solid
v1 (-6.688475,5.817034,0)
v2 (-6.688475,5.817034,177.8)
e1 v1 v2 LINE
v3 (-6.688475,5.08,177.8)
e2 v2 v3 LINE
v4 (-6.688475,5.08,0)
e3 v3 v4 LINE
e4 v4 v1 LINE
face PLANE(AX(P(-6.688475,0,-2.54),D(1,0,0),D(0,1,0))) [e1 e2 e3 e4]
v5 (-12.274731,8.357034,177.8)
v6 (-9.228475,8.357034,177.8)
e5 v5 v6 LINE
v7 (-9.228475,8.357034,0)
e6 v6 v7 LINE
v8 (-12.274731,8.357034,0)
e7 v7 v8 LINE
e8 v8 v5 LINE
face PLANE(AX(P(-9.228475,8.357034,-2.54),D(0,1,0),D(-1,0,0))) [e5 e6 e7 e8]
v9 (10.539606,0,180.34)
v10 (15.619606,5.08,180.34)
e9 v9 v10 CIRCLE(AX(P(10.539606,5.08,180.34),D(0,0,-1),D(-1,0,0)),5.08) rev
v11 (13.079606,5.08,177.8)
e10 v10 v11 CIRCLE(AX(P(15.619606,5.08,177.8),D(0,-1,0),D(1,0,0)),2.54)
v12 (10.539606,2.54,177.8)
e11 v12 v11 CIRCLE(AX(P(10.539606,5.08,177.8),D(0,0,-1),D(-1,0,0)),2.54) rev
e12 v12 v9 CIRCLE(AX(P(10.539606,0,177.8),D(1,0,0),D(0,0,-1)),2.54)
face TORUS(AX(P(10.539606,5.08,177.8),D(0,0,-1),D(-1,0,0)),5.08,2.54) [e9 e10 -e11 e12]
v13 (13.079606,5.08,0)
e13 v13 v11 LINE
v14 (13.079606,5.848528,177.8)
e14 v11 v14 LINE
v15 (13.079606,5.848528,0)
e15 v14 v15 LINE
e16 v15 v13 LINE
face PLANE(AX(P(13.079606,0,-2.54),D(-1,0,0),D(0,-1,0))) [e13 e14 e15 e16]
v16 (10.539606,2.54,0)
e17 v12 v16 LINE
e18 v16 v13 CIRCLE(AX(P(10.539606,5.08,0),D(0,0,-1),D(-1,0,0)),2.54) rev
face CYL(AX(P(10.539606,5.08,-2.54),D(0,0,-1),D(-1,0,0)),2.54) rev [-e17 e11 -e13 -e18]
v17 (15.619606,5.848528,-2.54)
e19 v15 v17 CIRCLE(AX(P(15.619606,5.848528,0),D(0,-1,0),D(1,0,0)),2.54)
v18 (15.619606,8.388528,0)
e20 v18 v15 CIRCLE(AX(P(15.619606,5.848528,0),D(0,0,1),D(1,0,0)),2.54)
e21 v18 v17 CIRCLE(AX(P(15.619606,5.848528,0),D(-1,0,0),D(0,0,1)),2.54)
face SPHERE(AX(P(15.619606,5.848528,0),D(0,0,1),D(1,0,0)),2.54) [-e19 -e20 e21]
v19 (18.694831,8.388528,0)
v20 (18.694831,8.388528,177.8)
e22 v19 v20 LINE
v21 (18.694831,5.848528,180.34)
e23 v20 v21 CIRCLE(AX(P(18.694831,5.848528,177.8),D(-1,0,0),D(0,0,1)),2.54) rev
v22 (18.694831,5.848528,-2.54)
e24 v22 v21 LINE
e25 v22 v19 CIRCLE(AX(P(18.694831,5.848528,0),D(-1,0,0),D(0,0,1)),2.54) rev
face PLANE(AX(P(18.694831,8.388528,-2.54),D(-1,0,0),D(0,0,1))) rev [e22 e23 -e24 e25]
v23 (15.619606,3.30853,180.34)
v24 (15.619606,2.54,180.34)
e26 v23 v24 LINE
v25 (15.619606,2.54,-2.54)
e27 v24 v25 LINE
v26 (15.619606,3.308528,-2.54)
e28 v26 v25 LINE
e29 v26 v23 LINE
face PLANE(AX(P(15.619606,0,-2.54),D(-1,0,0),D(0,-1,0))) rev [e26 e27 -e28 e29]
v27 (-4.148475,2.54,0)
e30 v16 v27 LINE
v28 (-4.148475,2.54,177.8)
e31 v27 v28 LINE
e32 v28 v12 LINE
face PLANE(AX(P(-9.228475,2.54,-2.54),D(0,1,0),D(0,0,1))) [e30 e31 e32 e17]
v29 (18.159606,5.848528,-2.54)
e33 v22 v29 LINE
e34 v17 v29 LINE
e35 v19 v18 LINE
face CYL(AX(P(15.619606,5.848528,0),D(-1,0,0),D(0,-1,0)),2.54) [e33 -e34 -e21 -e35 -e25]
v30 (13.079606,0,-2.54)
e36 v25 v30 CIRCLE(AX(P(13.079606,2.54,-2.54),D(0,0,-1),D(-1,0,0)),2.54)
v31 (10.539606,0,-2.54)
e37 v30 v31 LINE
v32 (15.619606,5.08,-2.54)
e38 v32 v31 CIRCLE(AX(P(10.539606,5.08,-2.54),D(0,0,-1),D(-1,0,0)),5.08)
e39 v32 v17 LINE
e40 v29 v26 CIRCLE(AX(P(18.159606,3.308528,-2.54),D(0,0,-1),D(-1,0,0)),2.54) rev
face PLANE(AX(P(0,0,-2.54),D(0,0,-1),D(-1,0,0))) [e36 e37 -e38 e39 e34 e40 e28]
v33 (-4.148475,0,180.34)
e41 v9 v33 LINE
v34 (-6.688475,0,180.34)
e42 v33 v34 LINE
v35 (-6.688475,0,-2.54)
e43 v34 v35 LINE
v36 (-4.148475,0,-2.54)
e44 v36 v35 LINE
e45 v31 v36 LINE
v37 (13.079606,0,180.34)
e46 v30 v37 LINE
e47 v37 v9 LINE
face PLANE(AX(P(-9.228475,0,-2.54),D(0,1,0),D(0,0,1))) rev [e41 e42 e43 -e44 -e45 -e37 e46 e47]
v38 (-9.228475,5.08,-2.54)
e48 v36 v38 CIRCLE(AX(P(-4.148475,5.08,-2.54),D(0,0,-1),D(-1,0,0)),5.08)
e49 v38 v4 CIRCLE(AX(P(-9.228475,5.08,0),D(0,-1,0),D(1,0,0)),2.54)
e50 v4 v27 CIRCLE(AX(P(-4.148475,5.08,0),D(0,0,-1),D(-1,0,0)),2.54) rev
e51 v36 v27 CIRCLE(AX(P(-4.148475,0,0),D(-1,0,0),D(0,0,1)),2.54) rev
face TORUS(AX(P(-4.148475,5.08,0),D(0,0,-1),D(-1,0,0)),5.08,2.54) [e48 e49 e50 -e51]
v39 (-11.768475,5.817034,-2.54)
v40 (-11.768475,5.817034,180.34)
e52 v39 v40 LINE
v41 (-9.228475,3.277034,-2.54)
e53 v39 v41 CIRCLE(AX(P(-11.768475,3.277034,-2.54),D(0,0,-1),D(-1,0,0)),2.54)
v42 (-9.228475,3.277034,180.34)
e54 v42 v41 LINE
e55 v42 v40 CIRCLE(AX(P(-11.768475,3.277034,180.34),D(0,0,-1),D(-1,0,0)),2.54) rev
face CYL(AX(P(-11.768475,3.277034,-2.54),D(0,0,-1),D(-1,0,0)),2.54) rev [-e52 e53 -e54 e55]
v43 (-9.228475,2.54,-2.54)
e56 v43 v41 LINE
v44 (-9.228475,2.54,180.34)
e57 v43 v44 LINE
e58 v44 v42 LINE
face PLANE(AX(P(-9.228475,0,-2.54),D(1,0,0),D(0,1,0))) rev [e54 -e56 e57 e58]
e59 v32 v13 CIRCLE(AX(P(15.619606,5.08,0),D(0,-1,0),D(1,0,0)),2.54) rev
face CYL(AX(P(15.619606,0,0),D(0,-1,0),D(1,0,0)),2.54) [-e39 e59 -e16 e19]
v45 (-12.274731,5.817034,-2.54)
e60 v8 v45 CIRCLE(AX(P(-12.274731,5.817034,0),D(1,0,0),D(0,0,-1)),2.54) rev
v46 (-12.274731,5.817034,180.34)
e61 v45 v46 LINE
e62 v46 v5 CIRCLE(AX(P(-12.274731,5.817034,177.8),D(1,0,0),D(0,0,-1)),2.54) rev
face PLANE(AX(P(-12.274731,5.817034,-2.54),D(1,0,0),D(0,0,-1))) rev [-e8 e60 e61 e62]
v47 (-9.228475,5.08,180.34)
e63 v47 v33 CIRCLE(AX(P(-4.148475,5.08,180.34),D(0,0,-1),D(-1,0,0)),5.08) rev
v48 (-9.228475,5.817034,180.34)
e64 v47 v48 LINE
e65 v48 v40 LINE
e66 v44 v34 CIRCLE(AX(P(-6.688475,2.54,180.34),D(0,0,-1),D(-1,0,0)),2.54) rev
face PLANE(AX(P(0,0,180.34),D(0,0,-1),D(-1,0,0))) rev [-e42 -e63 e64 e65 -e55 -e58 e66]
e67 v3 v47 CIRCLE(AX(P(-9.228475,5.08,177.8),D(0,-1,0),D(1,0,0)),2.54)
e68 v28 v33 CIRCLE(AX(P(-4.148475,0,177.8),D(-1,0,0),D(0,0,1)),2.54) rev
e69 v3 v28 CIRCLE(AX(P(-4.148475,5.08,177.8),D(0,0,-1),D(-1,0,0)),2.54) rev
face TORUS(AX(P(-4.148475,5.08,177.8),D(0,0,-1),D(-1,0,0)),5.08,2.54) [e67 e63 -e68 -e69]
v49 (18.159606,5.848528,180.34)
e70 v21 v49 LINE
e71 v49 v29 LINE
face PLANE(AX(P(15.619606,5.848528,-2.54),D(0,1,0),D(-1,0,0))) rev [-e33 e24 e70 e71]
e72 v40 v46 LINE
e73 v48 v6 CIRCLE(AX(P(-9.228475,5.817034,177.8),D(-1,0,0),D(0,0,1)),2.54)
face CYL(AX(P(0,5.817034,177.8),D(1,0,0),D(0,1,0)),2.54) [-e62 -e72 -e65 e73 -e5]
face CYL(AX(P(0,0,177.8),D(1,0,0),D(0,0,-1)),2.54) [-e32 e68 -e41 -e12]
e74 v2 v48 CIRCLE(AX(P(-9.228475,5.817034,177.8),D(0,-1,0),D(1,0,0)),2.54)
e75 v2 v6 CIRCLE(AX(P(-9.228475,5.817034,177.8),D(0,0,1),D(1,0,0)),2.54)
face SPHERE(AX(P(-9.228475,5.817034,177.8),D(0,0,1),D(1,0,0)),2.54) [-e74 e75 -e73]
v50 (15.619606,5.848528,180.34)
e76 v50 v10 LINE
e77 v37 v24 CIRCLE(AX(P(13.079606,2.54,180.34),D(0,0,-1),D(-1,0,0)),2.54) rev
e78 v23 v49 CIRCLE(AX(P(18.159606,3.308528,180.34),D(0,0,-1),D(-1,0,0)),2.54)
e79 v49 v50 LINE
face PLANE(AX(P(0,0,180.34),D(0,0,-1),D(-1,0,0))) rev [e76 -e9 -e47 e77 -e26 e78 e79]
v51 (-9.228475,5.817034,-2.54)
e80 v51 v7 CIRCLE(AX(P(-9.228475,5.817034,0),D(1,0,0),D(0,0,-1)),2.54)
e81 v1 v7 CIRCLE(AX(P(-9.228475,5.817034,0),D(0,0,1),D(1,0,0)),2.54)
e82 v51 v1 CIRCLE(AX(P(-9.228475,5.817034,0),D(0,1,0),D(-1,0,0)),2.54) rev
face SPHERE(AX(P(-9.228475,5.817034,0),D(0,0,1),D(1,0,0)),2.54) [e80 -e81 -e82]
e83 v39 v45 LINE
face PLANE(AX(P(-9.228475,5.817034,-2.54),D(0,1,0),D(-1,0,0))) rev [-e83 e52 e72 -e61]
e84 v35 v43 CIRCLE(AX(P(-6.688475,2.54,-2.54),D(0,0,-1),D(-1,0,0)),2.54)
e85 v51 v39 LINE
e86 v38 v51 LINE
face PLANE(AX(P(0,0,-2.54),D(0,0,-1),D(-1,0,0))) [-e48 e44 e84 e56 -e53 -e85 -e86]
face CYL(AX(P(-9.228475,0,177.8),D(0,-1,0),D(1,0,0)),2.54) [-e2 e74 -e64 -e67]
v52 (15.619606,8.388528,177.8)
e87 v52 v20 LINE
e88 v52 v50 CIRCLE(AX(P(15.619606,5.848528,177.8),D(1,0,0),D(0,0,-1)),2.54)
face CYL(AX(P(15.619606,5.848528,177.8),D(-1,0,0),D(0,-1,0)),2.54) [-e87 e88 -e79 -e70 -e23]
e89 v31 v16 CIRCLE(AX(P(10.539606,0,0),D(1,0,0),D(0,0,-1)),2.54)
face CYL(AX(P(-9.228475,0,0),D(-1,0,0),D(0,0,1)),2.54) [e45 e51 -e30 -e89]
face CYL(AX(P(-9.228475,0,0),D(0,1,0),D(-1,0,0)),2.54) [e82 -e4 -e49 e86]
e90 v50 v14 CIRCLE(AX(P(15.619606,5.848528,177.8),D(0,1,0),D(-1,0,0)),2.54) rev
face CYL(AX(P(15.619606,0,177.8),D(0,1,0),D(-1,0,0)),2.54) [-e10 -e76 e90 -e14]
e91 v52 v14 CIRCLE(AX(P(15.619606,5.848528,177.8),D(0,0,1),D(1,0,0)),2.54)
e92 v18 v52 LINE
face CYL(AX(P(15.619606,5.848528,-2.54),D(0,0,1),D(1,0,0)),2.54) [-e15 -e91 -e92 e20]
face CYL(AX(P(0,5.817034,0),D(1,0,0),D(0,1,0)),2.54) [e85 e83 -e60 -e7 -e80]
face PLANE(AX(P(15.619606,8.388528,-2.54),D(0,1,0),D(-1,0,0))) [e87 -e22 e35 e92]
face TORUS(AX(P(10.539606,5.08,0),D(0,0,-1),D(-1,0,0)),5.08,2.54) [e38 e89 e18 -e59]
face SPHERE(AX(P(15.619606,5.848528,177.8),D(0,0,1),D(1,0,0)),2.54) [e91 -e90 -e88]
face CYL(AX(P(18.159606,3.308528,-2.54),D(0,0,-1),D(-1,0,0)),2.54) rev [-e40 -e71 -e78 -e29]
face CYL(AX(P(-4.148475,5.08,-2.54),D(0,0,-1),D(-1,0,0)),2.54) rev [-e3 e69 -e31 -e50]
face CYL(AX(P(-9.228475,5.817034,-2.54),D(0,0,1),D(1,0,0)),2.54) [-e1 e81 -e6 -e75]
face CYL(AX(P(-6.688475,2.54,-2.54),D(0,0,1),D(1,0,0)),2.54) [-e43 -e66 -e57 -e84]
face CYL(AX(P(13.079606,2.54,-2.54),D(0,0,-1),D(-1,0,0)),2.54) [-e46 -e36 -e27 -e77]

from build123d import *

# Parameters (mm, degrees)
EXTRUDE_THIN2_DEPTH      = 180.34
EXTRUDE_THIN2_DEPTH_BACK = 2.54
FILLET1_R                = 2.54
FILLET2_R                = 2.54
FILLET3_R                = 2.54
FILLET4_R                = 2.54
FILLET5_R                = 2.54
FILLET6_R                = 2.54
FILLET7_R                = 2.54


with BuildPart() as part:
    # Sketch2 → Extrude-Thin2 (new, two sides: drawn at the far end of the back side and taken through both)
    with BuildSketch(Plane.XY.offset(-EXTRUDE_THIN2_DEPTH_BACK)):
        Polygon((-12.274730593, 5.817033739), (-9.228474815, 5.817033739), (-9.228474815, 0), (15.619605828, 0), (15.619605828, 5.848528279), (18.694831425, 5.848528279), (18.694831425, 8.388528279), (13.079605828, 8.388528279), (13.079605828, 2.54), (-6.688474815, 2.54), (-6.688474815, 8.357033739), (-12.274730593, 8.357033739), align=None)
    extrude(amount=EXTRUDE_THIN2_DEPTH + EXTRUDE_THIN2_DEPTH_BACK)

    # Fillet1
    fillet1_edges = [part.edges().sort_by_distance(p)[0] for p in [
        (-6.688474815, 2.54, 88.9),
        (13.079605828, 2.54, 88.9),
        (13.079605828, 5.46426414, 180.34),
        (3.195565506, 2.54, 180.34),
        (-6.688474815, 5.44851687, 180.34),
        (13.079605828, 5.46426414, -2.54),
        (3.195565506, 2.54, -2.54),
        (-6.688474815, 5.44851687, -2.54),
    ]]
    fillet(fillet1_edges, radius=FILLET1_R - 0.0001)  # a hair under: the kernel refuses the full size

    # Fillet2
    fillet2_edges = [part.edges().sort_by_distance(p)[0] for p in [
        (15.619605828, 5.848528279, 88.9),
    ]]
    fillet(fillet2_edges, radius=FILLET2_R)

    # Fillet3
    fillet3_edges = [part.edges().sort_by_distance(p)[0] for p in [
        (17.157168626, 8.388528279, -2.54),
        (17.157168626, 8.388528279, 180.34),
        (13.079605828, 8.388528279, 88.9),
        (13.823525314, 8.388528279, 179.596080514),
        (13.823525314, 8.388528279, -1.796080514),
    ]]
    fillet(fillet3_edges, radius=FILLET3_R - 0.0001)  # a hair under: the kernel refuses the full size

    # Fillet4
    fillet4_edges = [part.edges().sort_by_distance(p)[0] for p in [
        (15.619605828, 0, 88.9),
    ]]
    fillet(fillet4_edges, radius=FILLET4_R)

    # Fillet5
    fillet5_edges = [part.edges().sort_by_distance(p)[0] for p in [
        (-10.751552704, 8.357033739, -2.54),
        (-6.688474815, 8.357033739, 88.9),
        (-10.751552704, 8.357033739, 180.34),
        (-7.432394301, 8.357033739, 179.596080514),
        (-7.432394301, 8.357033739, -1.796080514),
    ]]
    fillet(fillet5_edges, radius=FILLET5_R - 0.0001)  # a hair under: the kernel refuses the full size

    # Fillet6
    fillet6_edges = [part.edges().sort_by_distance(p)[0] for p in [
        (-9.228474815, 0, 88.9),
    ]]
    fillet(fillet6_edges, radius=FILLET6_R)

    # Fillet7
    fillet7_edges = [part.edges().sort_by_distance(p)[0] for p in [
        (-9.228474815, 5.817033739, 88.9),
    ]]
    fillet(fillet7_edges, radius=FILLET7_R)


solid = part.part
